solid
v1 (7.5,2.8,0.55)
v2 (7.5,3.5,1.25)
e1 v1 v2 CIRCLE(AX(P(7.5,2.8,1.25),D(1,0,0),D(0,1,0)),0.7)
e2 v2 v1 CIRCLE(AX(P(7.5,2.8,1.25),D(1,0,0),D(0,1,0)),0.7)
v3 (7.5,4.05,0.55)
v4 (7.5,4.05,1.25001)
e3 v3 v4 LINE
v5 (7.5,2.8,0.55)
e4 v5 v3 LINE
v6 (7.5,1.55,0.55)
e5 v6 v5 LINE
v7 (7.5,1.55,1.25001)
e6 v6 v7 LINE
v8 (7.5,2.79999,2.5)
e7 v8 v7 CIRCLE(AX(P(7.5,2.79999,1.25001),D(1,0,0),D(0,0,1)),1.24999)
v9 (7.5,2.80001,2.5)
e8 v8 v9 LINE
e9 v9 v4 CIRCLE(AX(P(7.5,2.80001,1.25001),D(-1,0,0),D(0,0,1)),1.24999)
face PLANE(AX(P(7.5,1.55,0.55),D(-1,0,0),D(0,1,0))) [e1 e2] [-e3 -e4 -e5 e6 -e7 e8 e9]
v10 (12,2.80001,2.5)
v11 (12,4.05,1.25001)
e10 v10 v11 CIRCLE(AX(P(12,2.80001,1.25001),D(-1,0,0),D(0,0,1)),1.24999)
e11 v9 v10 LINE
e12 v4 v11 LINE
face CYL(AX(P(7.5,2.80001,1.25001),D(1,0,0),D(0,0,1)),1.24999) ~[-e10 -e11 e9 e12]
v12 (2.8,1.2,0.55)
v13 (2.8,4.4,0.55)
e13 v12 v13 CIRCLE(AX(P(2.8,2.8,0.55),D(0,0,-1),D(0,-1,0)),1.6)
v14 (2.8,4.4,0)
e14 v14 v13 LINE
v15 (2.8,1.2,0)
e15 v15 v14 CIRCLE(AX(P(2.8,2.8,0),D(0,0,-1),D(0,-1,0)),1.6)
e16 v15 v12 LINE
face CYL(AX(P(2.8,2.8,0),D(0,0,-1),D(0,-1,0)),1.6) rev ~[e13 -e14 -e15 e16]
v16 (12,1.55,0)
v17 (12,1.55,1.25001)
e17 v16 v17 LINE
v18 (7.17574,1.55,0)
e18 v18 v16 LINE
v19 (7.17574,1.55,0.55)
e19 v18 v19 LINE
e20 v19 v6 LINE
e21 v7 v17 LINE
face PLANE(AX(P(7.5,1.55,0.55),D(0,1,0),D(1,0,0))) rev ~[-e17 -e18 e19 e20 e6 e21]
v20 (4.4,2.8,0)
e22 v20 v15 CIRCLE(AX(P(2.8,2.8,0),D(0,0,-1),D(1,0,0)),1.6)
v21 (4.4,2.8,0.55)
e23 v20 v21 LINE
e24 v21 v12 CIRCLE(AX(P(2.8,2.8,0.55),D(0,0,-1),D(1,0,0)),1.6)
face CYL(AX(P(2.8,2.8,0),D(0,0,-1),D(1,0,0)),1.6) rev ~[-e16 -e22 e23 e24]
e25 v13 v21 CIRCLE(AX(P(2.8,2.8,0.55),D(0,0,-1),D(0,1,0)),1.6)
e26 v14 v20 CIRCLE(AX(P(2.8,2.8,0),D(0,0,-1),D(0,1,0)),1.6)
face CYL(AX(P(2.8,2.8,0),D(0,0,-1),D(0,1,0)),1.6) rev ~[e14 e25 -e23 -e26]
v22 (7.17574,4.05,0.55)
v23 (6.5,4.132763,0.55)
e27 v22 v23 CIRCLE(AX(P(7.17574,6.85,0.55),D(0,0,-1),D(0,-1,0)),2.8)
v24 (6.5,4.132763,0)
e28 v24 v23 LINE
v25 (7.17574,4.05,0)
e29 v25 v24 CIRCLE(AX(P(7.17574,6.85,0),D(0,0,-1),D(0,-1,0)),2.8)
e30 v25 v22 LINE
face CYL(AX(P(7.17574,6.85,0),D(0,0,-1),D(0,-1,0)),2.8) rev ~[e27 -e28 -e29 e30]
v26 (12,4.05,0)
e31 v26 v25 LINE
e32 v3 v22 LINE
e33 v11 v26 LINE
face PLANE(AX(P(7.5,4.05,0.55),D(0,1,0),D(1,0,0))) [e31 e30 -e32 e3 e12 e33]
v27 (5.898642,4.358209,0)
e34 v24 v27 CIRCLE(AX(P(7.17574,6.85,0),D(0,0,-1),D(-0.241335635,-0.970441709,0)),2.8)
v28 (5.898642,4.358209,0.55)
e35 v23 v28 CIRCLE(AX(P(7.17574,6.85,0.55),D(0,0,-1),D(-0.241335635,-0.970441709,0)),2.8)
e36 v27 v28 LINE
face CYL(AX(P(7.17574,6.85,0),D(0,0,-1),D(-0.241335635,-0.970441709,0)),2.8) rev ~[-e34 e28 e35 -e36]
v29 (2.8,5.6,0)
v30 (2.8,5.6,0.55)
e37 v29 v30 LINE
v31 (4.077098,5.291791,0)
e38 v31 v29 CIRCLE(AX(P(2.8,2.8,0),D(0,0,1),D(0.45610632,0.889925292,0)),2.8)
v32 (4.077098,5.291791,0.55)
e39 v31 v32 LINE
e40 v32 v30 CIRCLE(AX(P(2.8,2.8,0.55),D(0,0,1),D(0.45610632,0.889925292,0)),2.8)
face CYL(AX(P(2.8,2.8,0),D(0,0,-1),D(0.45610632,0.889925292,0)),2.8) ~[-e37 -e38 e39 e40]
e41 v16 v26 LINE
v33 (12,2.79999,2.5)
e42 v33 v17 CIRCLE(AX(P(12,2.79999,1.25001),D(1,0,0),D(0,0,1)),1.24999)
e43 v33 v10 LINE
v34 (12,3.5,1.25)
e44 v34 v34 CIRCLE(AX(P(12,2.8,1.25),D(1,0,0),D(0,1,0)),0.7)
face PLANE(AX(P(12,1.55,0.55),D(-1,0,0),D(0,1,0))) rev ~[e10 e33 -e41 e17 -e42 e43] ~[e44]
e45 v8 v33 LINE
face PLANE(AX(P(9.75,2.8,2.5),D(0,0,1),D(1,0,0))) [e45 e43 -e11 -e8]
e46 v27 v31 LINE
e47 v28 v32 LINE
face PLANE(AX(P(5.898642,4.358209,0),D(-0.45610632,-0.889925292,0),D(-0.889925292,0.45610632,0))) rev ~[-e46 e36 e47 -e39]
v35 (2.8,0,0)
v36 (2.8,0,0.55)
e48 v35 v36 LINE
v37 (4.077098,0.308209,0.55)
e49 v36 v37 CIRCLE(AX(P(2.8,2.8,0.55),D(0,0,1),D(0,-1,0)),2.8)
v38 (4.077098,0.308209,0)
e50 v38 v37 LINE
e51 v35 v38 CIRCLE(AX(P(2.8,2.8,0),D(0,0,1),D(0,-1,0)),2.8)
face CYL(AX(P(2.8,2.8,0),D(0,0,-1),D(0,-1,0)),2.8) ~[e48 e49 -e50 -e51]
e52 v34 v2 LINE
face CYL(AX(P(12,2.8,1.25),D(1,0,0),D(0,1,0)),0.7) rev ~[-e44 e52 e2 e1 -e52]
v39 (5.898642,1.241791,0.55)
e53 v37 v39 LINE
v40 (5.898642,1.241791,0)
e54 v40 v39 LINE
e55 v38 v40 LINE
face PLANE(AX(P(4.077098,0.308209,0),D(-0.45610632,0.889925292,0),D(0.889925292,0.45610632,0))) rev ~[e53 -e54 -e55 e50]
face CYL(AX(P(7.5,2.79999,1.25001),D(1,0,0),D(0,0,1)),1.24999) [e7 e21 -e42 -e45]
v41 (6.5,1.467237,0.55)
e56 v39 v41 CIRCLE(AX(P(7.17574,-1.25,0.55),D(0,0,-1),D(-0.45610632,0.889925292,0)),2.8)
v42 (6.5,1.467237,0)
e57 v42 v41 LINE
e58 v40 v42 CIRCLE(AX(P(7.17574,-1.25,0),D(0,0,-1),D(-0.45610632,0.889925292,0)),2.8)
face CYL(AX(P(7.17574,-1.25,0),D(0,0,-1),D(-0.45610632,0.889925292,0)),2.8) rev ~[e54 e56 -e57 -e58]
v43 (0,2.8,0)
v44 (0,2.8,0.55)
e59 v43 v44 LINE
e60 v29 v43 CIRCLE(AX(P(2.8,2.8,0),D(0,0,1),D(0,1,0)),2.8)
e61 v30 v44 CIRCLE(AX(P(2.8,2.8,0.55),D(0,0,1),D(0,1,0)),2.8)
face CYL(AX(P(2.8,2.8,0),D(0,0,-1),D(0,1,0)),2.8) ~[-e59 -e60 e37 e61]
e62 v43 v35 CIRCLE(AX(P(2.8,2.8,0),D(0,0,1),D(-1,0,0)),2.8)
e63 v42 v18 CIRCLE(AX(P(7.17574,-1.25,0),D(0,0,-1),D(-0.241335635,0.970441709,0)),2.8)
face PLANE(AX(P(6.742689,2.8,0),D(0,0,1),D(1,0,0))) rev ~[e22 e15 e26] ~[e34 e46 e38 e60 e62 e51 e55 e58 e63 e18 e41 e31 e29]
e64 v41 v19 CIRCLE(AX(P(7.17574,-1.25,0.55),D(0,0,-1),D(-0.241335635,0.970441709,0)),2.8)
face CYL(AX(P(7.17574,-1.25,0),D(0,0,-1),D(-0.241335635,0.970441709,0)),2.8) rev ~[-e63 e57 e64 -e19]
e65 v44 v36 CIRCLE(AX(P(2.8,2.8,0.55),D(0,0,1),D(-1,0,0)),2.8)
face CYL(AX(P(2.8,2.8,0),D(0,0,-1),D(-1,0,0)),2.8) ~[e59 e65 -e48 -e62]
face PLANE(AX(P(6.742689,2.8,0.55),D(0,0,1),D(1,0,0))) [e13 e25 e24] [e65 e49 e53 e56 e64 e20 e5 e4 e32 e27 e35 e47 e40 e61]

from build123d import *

# Parameters (mm, degrees)
F1_DEPTH = 0.55
F2_W     = 4.5
F2_H     = 2.5
F3_DEPTH = 1.95
F4_R     = 1.24999
F5_R     = 0.7
F6_DEPTH = 25


# Not quite as in the source:
# - a fillet or chamfer is up to 0.001 mm smaller than in the source, because OpenCascade refuses the exact size


with BuildPart() as f1:
    # F0 (on Top) → F1 (new body)
    with BuildSketch(Plane.XY):
        with BuildLine():
            Line((7.1757397782, 1.55), (12, 1.55))
            Line((12, 1.55), (12, 4.05))
            Line((12, 4.05), (7.1757397782, 4.05))
            ThreePointArc((7.1757397782, 4.05), (6.8353451552, 4.0707678217), (6.5, 4.1327632138))
            ThreePointArc((6.5, 4.1327632138), (6.1928359056, 4.2281876541), (5.8986420809, 4.3582091838))
            Line((5.8986420809, 4.3582091838), (4.0770976972, 5.2917908162))
            ThreePointArc((4.0770976972, 5.2917908162), (3.4568811592, 5.5218572965), (2.8, 5.6))
            Line((2.8, 5.6), (2.8, 4.4))
            ThreePointArc((2.8, 4.4), (3.9313708499, 3.9313708499), (4.4, 2.8))
            ThreePointArc((4.4, 2.8), (3.9313708499, 1.6686291501), (2.8, 1.2))
            Line((2.8, 1.2), (2.8, 0))
            ThreePointArc((2.8, 0), (3.4568811592, 0.0781427035), (4.0770976972, 0.3082091838))
            Line((4.0770976972, 0.3082091838), (5.8986420809, 1.2417908162))
            ThreePointArc((5.8986420809, 1.2417908162), (6.1928359056, 1.3718123459), (6.5, 1.4672367862))
            ThreePointArc((6.5, 1.4672367862), (6.8353451552, 1.5292321783), (7.1757397782, 1.55))
        make_face()
        with BuildLine():
            ThreePointArc((0, 2.8), (0.8201010127, 0.8201010127), (2.8, 0))
            Line((2.8, 0), (2.8, 1.2))
            ThreePointArc((2.8, 1.2), (1.2, 2.8), (2.8, 4.4))
            Line((2.8, 4.4), (2.8, 5.6))
            ThreePointArc((2.8, 5.6), (0.8201010127, 4.7798989873), (0, 2.8))
        make_face()
    extrude(amount=F1_DEPTH)

    # F2 (on face) → F3 (join)
    with BuildSketch(Plane.XY.offset(0.55)):
        with Locations((9.75, 2.8)):
            Rectangle(F2_W, F2_H)
    extrude(amount=F3_DEPTH)

    # F4 (radius 1.25 in the source; OpenCascade refuses exactly that, so slightly less here)
    f4_edges = [f1.edges().sort_by_distance(p)[0] for p in [
        (9.75, 1.55, 2.5),
        (9.75, 4.05, 2.5),
    ]]
    fillet(f4_edges, radius=F4_R)

    # F5 (on face) → F6 (cut)
    with BuildSketch(Plane.YZ.offset(12)):
        with Locations((2.8, 1.25)):
            Circle(F5_R)
    extrude(amount=-F6_DEPTH, mode=Mode.SUBTRACT)


solid = f1.part
